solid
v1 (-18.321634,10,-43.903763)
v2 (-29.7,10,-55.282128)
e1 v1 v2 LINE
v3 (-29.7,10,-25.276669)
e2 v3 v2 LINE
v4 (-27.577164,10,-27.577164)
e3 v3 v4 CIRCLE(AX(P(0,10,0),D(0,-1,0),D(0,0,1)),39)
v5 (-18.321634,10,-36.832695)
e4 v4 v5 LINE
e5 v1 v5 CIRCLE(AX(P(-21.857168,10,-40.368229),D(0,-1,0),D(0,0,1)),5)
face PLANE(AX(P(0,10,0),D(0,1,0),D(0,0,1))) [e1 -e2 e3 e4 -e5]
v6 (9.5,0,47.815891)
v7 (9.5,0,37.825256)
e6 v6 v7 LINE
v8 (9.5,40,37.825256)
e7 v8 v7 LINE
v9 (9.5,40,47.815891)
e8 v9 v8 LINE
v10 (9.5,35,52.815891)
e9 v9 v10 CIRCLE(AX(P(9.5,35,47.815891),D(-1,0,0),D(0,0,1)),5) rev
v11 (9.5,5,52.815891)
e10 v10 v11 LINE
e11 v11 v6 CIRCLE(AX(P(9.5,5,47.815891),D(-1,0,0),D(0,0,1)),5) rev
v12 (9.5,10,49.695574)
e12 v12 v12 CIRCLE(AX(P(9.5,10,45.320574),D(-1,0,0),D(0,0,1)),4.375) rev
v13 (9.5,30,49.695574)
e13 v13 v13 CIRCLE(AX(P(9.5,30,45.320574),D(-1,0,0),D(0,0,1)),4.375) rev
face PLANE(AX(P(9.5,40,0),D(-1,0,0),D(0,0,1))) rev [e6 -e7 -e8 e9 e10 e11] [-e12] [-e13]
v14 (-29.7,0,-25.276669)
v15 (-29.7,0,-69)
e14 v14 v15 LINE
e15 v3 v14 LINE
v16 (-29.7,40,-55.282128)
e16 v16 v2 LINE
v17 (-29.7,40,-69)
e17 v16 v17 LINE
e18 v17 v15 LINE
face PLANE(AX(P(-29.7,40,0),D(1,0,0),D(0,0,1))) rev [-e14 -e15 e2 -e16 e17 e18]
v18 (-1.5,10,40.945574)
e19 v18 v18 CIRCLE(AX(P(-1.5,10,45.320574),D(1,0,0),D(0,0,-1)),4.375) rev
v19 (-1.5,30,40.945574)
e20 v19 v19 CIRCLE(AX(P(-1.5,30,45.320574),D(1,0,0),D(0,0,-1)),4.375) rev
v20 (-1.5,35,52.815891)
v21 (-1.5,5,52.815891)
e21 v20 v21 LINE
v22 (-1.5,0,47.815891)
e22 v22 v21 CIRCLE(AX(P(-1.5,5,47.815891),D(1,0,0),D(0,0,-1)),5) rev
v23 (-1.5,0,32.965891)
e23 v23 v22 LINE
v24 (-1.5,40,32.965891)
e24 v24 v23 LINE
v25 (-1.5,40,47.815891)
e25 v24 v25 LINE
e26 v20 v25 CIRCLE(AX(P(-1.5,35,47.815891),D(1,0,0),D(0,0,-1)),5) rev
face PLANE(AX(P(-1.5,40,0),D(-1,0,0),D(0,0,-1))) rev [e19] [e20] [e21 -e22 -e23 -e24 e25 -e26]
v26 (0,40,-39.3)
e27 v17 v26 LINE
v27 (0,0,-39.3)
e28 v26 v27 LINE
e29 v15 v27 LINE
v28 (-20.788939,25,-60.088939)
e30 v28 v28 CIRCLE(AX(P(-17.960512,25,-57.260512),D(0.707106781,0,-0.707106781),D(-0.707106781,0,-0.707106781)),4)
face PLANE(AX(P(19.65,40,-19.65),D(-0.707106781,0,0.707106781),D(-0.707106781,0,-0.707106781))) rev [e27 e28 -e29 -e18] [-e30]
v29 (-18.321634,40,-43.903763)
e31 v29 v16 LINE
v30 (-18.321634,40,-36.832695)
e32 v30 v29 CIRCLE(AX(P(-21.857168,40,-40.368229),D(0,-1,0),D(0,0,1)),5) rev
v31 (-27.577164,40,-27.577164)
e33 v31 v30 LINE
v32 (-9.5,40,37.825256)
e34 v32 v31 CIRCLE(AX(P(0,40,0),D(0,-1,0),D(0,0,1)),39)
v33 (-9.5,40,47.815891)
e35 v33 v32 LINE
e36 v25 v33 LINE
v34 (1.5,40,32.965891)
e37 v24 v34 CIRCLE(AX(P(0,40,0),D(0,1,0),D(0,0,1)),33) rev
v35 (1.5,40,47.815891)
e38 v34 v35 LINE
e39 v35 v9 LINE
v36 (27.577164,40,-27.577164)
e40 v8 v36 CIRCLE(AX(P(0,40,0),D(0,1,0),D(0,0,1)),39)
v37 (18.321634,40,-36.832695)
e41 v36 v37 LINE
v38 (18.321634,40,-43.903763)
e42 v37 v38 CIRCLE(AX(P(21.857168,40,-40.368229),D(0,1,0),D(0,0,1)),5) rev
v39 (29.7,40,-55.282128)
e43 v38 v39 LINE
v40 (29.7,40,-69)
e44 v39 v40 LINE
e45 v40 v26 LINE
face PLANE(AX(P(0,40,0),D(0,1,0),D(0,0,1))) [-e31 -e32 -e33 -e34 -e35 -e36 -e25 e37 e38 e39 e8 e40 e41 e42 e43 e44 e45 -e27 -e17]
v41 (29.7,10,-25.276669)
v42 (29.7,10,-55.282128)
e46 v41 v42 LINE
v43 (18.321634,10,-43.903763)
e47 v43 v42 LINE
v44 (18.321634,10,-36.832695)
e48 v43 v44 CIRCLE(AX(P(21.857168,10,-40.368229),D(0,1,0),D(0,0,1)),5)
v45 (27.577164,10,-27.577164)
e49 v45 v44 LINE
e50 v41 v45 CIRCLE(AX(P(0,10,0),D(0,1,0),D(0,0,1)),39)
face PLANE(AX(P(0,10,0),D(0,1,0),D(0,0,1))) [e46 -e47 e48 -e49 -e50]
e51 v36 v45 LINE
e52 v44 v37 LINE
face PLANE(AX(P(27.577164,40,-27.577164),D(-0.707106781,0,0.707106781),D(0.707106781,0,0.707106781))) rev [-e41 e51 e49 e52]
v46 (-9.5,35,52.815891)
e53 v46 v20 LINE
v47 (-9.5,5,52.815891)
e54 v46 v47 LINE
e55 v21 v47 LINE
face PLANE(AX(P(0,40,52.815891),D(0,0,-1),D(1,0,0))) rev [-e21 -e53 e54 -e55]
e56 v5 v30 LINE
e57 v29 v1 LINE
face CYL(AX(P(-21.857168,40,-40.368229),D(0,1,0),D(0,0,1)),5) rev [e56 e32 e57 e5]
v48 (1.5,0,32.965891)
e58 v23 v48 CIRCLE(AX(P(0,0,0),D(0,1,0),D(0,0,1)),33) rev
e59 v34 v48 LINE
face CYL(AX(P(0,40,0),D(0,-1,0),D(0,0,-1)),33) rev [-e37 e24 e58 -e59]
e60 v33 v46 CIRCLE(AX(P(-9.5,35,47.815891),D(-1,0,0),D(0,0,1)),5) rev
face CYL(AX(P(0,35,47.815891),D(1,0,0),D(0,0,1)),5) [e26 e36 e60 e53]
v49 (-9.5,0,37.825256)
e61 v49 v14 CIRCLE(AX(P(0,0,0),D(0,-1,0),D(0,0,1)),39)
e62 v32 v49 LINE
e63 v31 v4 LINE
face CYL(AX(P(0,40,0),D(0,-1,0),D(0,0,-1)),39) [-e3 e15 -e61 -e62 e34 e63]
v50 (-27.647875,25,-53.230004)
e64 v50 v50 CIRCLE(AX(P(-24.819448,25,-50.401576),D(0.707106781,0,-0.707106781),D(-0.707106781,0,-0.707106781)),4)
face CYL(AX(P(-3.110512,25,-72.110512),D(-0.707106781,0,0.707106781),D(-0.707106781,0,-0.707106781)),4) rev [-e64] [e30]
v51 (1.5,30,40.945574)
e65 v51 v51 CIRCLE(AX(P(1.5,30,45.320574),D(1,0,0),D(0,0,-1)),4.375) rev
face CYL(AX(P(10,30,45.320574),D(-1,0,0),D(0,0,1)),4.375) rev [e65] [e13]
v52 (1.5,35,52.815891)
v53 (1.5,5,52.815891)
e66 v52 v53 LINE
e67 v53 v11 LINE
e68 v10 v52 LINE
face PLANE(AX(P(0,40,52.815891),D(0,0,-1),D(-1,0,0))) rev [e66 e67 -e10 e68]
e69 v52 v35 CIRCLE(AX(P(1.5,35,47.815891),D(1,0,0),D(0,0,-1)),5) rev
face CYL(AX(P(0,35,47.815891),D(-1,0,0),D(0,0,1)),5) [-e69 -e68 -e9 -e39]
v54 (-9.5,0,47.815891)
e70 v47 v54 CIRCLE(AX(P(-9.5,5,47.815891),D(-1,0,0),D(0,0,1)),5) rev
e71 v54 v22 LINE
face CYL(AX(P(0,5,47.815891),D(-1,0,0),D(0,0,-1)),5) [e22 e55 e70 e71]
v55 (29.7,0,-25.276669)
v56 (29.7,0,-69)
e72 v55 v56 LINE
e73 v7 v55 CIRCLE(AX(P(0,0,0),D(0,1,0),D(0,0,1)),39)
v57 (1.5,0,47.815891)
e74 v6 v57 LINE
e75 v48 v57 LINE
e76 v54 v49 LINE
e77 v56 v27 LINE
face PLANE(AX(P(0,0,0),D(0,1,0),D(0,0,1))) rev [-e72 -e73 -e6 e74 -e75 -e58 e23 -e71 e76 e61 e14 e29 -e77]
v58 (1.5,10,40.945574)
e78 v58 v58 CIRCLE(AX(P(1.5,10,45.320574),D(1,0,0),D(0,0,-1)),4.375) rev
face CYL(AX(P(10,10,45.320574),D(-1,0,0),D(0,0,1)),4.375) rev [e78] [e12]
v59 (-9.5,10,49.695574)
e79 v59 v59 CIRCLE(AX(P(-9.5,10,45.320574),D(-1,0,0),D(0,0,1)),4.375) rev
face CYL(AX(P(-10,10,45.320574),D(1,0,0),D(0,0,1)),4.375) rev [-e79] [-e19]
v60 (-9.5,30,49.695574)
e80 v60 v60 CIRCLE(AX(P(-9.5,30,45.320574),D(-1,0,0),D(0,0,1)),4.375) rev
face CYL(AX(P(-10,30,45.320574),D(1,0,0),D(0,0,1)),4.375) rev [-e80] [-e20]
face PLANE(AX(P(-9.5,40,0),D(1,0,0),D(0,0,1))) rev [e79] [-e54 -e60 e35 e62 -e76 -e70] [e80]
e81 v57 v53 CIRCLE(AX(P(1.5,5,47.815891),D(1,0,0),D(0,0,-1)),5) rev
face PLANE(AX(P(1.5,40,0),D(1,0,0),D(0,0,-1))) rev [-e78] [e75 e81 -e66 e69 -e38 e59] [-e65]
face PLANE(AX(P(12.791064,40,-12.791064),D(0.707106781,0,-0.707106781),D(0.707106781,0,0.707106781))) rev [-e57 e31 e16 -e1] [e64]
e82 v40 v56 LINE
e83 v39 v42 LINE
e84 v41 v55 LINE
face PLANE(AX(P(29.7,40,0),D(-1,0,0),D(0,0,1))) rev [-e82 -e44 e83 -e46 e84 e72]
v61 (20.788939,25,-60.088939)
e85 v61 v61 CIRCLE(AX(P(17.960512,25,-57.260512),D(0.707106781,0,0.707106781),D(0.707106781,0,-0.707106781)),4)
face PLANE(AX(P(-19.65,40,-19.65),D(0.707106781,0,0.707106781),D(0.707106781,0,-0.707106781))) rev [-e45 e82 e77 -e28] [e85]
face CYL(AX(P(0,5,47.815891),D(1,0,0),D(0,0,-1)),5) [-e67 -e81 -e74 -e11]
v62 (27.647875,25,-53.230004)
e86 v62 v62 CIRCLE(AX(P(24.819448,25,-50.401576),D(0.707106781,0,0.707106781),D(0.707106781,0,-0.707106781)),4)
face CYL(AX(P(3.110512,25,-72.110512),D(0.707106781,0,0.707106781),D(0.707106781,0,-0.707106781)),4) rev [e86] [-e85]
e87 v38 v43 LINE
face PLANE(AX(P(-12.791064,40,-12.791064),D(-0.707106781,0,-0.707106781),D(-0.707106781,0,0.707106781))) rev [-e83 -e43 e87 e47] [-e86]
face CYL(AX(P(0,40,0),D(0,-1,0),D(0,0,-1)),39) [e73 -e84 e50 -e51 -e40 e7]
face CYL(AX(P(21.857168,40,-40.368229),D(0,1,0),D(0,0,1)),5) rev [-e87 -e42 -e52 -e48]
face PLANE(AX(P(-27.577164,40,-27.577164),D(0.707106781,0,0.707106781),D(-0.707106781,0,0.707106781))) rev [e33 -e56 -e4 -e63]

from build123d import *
from build123d.topology import SkipClean

# Parameters (mm, degrees)
BOSS_EXTRUDE7_DEPTH = 40
BOSS_EXTRUDE8_DEPTH = 10
SKETCH16_R          = 4
CUT_EXTRUDE6_DEPTH  = 93.663838512
SKETCH17_R          = 4.375
CUT_EXTRUDE7_DEPTH  = 10
FILLET2_R           = 5


with BuildPart() as part:
    # Sketch15 → Boss-Extrude7 (new body)
    with BuildSketch(Plane(origin=(0, 0, 0), x_dir=(0, 0, -1), z_dir=(0, 1, 0))):
        with BuildLine():
            ThreePointArc((33, 0), (0.750193874, -32.991471764), (-32.965891464, -1.5))
            Line((-32.965891464, -1.5), (-52.815891464, -1.5))
            Line((-52.815891464, -1.5), (-52.815891464, -9.5))
            Line((-52.815891464, -9.5), (-37.825256113, -9.5))
            ThreePointArc((-37.825256113, -9.5), (-11.890195924, -37.143279889), (25.276669084, -29.7))
            ThreePointArc((25.276669084, -29.7), (26.44822372, -28.661672353), (27.577164466, -27.577164466))
            Line((27.577164466, -27.577164466), (40.368228689, -14.786100244))
            Line((40.368228689, -14.786100244), (55.282128445, -29.7))
            Line((55.282128445, -29.7), (69, -29.7))
            Line((69, -29.7), (39.3, 0))
            Line((39.3, 0), (33, 0))
        make_face()
    extrude(amount=BOSS_EXTRUDE7_DEPTH)

    # Sketch15<4> → Boss-Extrude8 (add)
    with BuildSketch(Plane(origin=(0, 0, 0), x_dir=(0, 0, -1), z_dir=(0, 1, 0))):
        with BuildLine():
            ThreePointArc((27.577164466, -27.577164466), (26.44822372, -28.661672353), (25.276669084, -29.7))
            Line((25.276669084, -29.7), (55.282128445, -29.7))
            Line((55.282128445, -29.7), (40.368228689, -14.786100244))
            Line((40.368228689, -14.786100244), (27.577164466, -27.577164466))
        make_face()
    extrude(amount=BOSS_EXTRUDE8_DEPTH)

    # Sketch16 → Cut-Extrude6 (cut, through all)
    with BuildSketch(Plane(origin=(-12.791064222, 0, -12.791064222), x_dir=(-0.707106781186546, 0, 0.707106781186549), z_dir=(0.707106781186549, 0, 0.707106781186546))):
        with Locations((-53.189296501, -25)):
            Circle(SKETCH16_R)
    extrude(amount=-CUT_EXTRUDE6_DEPTH, mode=Mode.SUBTRACT)

    # Sketch17 → Cut-Extrude7 (cut)
    with BuildSketch(Plane(origin=(0, 0, 0), x_dir=(0, -1, 0), z_dir=(1, 0, 0))):
        with Locations((-30, -45.320573788)):
            Circle(SKETCH17_R)
        with Locations((-10, -45.320573788)):
            Circle(SKETCH17_R)
    extrude(amount=CUT_EXTRUDE7_DEPTH, mode=Mode.SUBTRACT)

    # Fillet2
    fillet2_edges = [part.edges().sort_by_distance(p)[0] for p in [
        (14.786100244, 25, -40.368228689),
        (5.5, 0, 52.815891464),
        (5.5, 40, 52.815891464),
    ]]
    fillet(fillet2_edges, radius=FILLET2_R)

    # Mirror2: part across plane


with BuildPart() as part_1:
    with SkipClean():  # the faces are left unmerged after this step: merging them gives an invalid solid
        add(part.part)
        add(part.part.mirror(Plane(origin=(0, 40, 0), x_dir=(0, 0, 1), z_dir=(-1, 0, 0))))


solid = part_1.part
